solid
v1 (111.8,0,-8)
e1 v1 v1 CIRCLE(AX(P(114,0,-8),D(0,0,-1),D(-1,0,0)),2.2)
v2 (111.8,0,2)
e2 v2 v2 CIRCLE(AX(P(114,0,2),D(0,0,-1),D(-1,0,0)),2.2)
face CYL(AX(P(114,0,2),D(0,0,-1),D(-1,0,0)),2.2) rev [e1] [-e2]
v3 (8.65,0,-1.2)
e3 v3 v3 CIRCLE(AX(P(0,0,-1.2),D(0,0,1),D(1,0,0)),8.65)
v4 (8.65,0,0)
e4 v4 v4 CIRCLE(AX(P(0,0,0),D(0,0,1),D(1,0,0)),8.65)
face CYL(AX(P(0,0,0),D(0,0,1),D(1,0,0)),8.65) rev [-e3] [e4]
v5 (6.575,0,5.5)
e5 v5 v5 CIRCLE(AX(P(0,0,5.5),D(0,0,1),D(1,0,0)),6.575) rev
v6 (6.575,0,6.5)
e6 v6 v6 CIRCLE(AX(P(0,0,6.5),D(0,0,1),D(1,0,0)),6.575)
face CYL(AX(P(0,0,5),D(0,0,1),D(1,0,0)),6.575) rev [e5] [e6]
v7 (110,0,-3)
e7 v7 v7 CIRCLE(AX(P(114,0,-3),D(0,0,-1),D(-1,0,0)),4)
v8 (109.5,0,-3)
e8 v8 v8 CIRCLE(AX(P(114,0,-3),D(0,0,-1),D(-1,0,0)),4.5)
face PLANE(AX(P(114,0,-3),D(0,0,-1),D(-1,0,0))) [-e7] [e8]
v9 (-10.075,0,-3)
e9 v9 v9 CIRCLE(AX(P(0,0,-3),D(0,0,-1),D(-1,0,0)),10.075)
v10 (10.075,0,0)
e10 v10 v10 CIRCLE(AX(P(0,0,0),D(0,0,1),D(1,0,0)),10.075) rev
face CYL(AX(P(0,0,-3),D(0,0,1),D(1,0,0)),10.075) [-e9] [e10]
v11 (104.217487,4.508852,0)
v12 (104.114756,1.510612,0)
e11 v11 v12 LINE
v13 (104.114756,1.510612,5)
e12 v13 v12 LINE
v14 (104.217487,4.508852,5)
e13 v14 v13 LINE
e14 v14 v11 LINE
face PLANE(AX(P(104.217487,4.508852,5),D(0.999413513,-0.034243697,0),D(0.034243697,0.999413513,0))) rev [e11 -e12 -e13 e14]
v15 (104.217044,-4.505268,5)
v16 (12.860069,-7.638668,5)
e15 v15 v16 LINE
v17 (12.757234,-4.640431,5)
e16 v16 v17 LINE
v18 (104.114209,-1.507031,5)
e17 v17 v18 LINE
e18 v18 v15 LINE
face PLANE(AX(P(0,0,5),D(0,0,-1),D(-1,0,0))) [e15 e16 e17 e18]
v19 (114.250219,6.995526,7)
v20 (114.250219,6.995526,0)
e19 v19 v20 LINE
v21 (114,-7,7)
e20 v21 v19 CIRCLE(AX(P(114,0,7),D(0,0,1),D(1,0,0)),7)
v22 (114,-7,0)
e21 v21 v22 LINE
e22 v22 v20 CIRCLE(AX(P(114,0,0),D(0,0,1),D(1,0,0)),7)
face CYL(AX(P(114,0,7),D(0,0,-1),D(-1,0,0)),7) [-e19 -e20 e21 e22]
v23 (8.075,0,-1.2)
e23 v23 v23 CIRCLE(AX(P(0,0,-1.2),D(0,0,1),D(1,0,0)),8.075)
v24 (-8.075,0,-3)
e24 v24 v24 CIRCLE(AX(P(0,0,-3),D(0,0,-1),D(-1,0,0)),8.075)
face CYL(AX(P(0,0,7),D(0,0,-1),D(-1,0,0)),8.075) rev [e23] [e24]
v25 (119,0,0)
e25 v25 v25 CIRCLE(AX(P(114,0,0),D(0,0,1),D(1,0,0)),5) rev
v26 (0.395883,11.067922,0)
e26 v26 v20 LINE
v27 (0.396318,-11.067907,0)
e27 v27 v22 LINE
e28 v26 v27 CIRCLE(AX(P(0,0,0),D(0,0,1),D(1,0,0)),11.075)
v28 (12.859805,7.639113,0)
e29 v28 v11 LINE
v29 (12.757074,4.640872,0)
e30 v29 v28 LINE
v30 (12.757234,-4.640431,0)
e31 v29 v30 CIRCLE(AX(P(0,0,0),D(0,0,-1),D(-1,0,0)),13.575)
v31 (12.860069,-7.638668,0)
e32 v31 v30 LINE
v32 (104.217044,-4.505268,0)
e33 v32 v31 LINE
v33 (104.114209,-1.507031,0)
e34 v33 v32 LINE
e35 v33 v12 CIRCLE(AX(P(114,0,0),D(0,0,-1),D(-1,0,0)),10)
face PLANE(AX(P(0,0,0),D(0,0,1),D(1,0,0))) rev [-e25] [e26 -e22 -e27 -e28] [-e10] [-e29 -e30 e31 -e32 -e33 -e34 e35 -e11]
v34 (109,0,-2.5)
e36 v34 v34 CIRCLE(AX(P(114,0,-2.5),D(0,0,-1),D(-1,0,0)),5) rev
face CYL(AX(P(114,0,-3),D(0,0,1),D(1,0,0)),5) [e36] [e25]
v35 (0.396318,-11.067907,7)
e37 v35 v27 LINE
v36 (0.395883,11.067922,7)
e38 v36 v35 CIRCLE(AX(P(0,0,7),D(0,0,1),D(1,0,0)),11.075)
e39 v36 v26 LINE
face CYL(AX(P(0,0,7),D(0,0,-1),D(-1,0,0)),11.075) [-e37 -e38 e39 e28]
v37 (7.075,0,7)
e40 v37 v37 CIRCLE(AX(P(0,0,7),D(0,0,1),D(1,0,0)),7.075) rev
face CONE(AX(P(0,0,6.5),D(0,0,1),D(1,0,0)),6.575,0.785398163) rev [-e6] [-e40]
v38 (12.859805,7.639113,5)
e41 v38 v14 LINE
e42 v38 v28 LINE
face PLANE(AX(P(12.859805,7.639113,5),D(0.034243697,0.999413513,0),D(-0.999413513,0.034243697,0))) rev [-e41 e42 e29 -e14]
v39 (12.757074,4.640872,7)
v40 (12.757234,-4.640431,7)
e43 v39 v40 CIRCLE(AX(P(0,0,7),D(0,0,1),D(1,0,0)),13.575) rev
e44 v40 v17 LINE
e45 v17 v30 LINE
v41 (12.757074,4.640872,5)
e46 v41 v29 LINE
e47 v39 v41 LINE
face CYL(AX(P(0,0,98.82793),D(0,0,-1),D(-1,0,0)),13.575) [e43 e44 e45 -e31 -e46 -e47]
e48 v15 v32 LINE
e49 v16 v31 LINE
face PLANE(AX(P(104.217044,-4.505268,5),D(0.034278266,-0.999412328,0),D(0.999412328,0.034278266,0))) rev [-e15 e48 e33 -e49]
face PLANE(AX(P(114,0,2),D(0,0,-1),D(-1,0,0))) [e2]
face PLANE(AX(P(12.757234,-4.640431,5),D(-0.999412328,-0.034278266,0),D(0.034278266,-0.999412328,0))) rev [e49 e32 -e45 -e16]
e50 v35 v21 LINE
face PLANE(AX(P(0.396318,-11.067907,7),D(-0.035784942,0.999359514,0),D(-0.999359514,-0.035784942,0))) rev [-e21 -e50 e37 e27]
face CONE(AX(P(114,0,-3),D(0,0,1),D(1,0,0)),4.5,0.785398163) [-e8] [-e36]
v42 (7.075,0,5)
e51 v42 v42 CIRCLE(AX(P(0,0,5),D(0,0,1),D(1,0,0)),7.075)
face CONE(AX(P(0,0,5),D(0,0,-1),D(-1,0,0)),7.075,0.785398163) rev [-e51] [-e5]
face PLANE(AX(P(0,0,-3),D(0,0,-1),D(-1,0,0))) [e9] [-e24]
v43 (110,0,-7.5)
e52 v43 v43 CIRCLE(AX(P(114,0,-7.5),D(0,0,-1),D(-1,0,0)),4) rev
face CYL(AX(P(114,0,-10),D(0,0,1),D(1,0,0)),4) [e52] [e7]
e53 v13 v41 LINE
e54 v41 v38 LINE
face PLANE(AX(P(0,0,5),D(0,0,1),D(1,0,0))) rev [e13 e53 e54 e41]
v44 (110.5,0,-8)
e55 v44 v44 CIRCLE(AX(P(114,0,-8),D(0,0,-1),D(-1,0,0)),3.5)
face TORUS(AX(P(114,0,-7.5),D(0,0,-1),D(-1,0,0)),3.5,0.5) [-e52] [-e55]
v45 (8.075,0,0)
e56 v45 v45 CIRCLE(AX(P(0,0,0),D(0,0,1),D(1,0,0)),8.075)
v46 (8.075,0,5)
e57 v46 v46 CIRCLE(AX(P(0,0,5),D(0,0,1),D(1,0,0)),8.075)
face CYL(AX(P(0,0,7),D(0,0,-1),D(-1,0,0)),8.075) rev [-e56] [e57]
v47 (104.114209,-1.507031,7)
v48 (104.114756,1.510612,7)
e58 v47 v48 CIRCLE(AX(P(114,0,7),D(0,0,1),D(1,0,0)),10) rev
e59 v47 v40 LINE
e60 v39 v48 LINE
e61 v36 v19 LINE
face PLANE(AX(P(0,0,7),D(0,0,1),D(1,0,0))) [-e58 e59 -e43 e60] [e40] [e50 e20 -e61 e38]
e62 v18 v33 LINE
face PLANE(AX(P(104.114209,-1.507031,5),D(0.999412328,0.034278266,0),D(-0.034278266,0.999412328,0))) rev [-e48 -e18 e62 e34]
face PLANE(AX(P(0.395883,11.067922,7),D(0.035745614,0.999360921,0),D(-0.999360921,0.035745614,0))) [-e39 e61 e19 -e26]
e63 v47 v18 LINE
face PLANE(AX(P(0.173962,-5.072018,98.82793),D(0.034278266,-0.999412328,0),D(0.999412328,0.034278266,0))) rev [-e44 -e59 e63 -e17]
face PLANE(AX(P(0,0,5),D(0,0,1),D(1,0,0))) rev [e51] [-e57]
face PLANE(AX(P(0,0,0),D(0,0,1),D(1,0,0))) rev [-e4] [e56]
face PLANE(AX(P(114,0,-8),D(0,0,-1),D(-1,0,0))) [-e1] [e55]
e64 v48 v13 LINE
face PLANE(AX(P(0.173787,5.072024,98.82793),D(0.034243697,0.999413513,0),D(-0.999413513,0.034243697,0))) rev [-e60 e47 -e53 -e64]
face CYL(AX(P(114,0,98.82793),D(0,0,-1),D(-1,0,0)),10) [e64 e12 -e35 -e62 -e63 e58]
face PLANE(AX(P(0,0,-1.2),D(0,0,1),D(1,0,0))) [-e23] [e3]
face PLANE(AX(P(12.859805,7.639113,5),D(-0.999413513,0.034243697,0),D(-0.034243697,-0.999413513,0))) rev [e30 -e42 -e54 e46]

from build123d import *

# Parameters (mm, degrees)
SKETCH_1_R          = 8.075
EXTRUDE_1_DEPTH     = 7
EXTRUDE_START       = -2
SKETCH_2_R          = 8.075
SKETCH_2_R_2        = 6.575
EXTRUDE_2_DEPTH     = 2
SKETCH_3_R          = 4
EXTRUDE_3_DEPTH     = 10
SKETCH_4_R          = 5
SKETCH_4_R_2        = 4
EXTRUDE_4_DEPTH     = 3
CHAMFER_1_SIZE      = 0.5
CUT_EXTRUDE_1_DEPTH = 7
CUT_EXTRUDE_2_DEPTH = 5
CUT_EXTRUDE_START   = -2
SKETCH_8_R          = 4
CUT_EXTRUDE_3_DEPTH = 2
FILLET_1_R          = 0.5
SKETCH_9_R          = 2.2
CUT_EXTRUDE_4_DEPTH = 10
EXTRUDE_START_2     = 3
SKETCH_10_R         = 10.075
SKETCH_10_R_2       = 8.075
EXTRUDE_5_DEPTH     = 3


with BuildPart() as part:
    # 草图1 → 凸台-拉伸1 (new body)
    with BuildSketch(Plane.XY):
        with BuildLine():
            ThreePointArc((0.395882675, 11.067922204), (-11.074999998, -0.000217919), (0.396318234, -11.067906616))
            Line((0.396318234, -11.067906616), (114, -7))
            ThreePointArc((114, -7), (120.998881523, -0.125129643), (114.250219298, 6.995526449))
            Line((114.250219298, 6.995526449), (0.395882675, 11.067922204))
        make_face()
        Circle(SKETCH_1_R, mode=Mode.SUBTRACT)
    extrude(amount=EXTRUDE_1_DEPTH)

    # 草图2 → 凸台-拉伸2 (add)
    with BuildSketch(Plane.XY.offset(7).offset(EXTRUDE_START)):
        Circle(SKETCH_2_R)
        Circle(SKETCH_2_R_2, mode=Mode.SUBTRACT)
    extrude(amount=EXTRUDE_2_DEPTH)

    # 草图3 → 凸台-拉伸3 (add)
    with BuildSketch(Plane(origin=(0, 0, 0), x_dir=(-1, 0, 0), z_dir=(0, 0, -1))):
        with Locations((-114, 0)):
            Circle(SKETCH_3_R)
    extrude(amount=EXTRUDE_3_DEPTH)

    # 草图4 → 凸台-拉伸4 (add)
    with BuildSketch(Plane(origin=(0, 0, 0), x_dir=(-1, 0, 0), z_dir=(0, 0, -1))):
        with Locations(Location((-114, 0, 0), (0, 0, 180))):
            Circle(SKETCH_4_R)
        with Locations((-114, 0)):
            Circle(SKETCH_4_R_2, mode=Mode.SUBTRACT)
    extrude(amount=EXTRUDE_4_DEPTH)

    # 倒角1
    chamfer_1_edges = [part.edges().sort_by_distance(p)[0] for p in [
        (-6.575, 0, 5),
        (-6.575, 0, 7),
        (118, 0, -10),
        (109, 0, -3),
    ]]
    chamfer(chamfer_1_edges, length=CHAMFER_1_SIZE)

    # 草图5 → 切除-拉伸1 (cut)
    with BuildSketch(Plane(origin=(0, 0, 0), x_dir=(-1, 0, 0), z_dir=(0, 0, -1))):
        with BuildLine():
            ThreePointArc((-12.757234161, -4.640431182), (-13.574999998, 0.000234775), (-12.757073645, 4.640872443))
            Line((-12.757073645, 4.640872443), (-104.114755838, 1.510611753))
            ThreePointArc((-104.114755838, 1.510611753), (-104.028730231, 0.75748214), (-104, 0))
            ThreePointArc((-104, 0), (-104.028593207, -0.755676237), (-104.114209315, -1.507031033))
            Line((-104.114209315, -1.507031033), (-12.757234161, -4.640431182))
        make_face()
    extrude(amount=-CUT_EXTRUDE_1_DEPTH, mode=Mode.SUBTRACT)

    # 草图6 → 切除-拉伸2 (cut)
    with BuildSketch(Plane(origin=(0, 0, 0), x_dir=(-1, 0, 0), z_dir=(0, 0, -1))):
        Polygon((-104.114209315, -1.507031033), (-12.757234161, -4.640431182), (-12.860068961, -7.638668165), (-104.217044114, -4.505268015), align=None)
        Polygon((-12.757073645, 4.640872443), (-104.114755838, 1.510611753), (-104.217486931, 4.508852291), (-12.859804737, 7.63911298), align=None)
    extrude(amount=-CUT_EXTRUDE_2_DEPTH, mode=Mode.SUBTRACT)

    # 草图8 → 切除-拉伸3 (cut)
    with BuildSketch(Plane(origin=(0, 0, -10), x_dir=(-1, 0, 0), z_dir=(0, 0, -1)).offset(CUT_EXTRUDE_START)):
        with Locations((-114, 0)):
            Circle(SKETCH_8_R)
    extrude(amount=CUT_EXTRUDE_3_DEPTH, mode=Mode.SUBTRACT)

    # 圆角1
    fillet_1_edges = [part.edges().sort_by_distance(p)[0] for p in [
        (118, 0, -8),
    ]]
    fillet(fillet_1_edges, radius=FILLET_1_R)

    # 草图9 → 切除-拉伸4 (cut)
    with BuildSketch(Plane(origin=(0, 0, -8), x_dir=(-1, 0, 0), z_dir=(0, 0, -1))):
        with Locations((-114, 0)):
            Circle(SKETCH_9_R)
    extrude(amount=-CUT_EXTRUDE_4_DEPTH, mode=Mode.SUBTRACT)

    # 草图10 → 凸台-拉伸5 (add)
    with BuildSketch(Plane(origin=(0, 0, 0), x_dir=(-1, 0, 0), z_dir=(0, 0, -1)).offset(EXTRUDE_START_2)):
        with Locations(Location((0, 0, 0), (0, 0, 180))):
            Circle(SKETCH_10_R)
        Circle(SKETCH_10_R_2, mode=Mode.SUBTRACT)
    extrude(amount=-EXTRUDE_5_DEPTH)

    # 切除-旋转2: read off the stored shape, not the designer's step
    # 切除-旋转2: loft between two sections, ruled curve by curve
    cut_revolve_2_from = [
        Edge.make_three_point_arc((8.65, 0, -1.2), (0, 8.65, -1.2), (-8.65, 0, -1.2)),
        Edge.make_three_point_arc((-8.65, 0, -1.2), (0, -8.65, -1.2), (8.65, 0, -1.2)),
    ]
    cut_revolve_2_to = [
        Edge.make_three_point_arc((8.65, 0, 0), (0, 8.65, 0), (-8.65, 0, 0)),
        Edge.make_three_point_arc((-8.65, 0, 0), (0, -8.65, 0), (8.65, 0, 0)),
    ]
    cut_revolve_2 = Solid(Shell([*[Face.make_surface_from_curves(cut_revolve_2_from[k], cut_revolve_2_to[k]) for k in range(2)], Face(Wire(cut_revolve_2_from)), Face(Wire(cut_revolve_2_to))]))
    add(cut_revolve_2, mode=Mode.SUBTRACT)


solid = part.part
